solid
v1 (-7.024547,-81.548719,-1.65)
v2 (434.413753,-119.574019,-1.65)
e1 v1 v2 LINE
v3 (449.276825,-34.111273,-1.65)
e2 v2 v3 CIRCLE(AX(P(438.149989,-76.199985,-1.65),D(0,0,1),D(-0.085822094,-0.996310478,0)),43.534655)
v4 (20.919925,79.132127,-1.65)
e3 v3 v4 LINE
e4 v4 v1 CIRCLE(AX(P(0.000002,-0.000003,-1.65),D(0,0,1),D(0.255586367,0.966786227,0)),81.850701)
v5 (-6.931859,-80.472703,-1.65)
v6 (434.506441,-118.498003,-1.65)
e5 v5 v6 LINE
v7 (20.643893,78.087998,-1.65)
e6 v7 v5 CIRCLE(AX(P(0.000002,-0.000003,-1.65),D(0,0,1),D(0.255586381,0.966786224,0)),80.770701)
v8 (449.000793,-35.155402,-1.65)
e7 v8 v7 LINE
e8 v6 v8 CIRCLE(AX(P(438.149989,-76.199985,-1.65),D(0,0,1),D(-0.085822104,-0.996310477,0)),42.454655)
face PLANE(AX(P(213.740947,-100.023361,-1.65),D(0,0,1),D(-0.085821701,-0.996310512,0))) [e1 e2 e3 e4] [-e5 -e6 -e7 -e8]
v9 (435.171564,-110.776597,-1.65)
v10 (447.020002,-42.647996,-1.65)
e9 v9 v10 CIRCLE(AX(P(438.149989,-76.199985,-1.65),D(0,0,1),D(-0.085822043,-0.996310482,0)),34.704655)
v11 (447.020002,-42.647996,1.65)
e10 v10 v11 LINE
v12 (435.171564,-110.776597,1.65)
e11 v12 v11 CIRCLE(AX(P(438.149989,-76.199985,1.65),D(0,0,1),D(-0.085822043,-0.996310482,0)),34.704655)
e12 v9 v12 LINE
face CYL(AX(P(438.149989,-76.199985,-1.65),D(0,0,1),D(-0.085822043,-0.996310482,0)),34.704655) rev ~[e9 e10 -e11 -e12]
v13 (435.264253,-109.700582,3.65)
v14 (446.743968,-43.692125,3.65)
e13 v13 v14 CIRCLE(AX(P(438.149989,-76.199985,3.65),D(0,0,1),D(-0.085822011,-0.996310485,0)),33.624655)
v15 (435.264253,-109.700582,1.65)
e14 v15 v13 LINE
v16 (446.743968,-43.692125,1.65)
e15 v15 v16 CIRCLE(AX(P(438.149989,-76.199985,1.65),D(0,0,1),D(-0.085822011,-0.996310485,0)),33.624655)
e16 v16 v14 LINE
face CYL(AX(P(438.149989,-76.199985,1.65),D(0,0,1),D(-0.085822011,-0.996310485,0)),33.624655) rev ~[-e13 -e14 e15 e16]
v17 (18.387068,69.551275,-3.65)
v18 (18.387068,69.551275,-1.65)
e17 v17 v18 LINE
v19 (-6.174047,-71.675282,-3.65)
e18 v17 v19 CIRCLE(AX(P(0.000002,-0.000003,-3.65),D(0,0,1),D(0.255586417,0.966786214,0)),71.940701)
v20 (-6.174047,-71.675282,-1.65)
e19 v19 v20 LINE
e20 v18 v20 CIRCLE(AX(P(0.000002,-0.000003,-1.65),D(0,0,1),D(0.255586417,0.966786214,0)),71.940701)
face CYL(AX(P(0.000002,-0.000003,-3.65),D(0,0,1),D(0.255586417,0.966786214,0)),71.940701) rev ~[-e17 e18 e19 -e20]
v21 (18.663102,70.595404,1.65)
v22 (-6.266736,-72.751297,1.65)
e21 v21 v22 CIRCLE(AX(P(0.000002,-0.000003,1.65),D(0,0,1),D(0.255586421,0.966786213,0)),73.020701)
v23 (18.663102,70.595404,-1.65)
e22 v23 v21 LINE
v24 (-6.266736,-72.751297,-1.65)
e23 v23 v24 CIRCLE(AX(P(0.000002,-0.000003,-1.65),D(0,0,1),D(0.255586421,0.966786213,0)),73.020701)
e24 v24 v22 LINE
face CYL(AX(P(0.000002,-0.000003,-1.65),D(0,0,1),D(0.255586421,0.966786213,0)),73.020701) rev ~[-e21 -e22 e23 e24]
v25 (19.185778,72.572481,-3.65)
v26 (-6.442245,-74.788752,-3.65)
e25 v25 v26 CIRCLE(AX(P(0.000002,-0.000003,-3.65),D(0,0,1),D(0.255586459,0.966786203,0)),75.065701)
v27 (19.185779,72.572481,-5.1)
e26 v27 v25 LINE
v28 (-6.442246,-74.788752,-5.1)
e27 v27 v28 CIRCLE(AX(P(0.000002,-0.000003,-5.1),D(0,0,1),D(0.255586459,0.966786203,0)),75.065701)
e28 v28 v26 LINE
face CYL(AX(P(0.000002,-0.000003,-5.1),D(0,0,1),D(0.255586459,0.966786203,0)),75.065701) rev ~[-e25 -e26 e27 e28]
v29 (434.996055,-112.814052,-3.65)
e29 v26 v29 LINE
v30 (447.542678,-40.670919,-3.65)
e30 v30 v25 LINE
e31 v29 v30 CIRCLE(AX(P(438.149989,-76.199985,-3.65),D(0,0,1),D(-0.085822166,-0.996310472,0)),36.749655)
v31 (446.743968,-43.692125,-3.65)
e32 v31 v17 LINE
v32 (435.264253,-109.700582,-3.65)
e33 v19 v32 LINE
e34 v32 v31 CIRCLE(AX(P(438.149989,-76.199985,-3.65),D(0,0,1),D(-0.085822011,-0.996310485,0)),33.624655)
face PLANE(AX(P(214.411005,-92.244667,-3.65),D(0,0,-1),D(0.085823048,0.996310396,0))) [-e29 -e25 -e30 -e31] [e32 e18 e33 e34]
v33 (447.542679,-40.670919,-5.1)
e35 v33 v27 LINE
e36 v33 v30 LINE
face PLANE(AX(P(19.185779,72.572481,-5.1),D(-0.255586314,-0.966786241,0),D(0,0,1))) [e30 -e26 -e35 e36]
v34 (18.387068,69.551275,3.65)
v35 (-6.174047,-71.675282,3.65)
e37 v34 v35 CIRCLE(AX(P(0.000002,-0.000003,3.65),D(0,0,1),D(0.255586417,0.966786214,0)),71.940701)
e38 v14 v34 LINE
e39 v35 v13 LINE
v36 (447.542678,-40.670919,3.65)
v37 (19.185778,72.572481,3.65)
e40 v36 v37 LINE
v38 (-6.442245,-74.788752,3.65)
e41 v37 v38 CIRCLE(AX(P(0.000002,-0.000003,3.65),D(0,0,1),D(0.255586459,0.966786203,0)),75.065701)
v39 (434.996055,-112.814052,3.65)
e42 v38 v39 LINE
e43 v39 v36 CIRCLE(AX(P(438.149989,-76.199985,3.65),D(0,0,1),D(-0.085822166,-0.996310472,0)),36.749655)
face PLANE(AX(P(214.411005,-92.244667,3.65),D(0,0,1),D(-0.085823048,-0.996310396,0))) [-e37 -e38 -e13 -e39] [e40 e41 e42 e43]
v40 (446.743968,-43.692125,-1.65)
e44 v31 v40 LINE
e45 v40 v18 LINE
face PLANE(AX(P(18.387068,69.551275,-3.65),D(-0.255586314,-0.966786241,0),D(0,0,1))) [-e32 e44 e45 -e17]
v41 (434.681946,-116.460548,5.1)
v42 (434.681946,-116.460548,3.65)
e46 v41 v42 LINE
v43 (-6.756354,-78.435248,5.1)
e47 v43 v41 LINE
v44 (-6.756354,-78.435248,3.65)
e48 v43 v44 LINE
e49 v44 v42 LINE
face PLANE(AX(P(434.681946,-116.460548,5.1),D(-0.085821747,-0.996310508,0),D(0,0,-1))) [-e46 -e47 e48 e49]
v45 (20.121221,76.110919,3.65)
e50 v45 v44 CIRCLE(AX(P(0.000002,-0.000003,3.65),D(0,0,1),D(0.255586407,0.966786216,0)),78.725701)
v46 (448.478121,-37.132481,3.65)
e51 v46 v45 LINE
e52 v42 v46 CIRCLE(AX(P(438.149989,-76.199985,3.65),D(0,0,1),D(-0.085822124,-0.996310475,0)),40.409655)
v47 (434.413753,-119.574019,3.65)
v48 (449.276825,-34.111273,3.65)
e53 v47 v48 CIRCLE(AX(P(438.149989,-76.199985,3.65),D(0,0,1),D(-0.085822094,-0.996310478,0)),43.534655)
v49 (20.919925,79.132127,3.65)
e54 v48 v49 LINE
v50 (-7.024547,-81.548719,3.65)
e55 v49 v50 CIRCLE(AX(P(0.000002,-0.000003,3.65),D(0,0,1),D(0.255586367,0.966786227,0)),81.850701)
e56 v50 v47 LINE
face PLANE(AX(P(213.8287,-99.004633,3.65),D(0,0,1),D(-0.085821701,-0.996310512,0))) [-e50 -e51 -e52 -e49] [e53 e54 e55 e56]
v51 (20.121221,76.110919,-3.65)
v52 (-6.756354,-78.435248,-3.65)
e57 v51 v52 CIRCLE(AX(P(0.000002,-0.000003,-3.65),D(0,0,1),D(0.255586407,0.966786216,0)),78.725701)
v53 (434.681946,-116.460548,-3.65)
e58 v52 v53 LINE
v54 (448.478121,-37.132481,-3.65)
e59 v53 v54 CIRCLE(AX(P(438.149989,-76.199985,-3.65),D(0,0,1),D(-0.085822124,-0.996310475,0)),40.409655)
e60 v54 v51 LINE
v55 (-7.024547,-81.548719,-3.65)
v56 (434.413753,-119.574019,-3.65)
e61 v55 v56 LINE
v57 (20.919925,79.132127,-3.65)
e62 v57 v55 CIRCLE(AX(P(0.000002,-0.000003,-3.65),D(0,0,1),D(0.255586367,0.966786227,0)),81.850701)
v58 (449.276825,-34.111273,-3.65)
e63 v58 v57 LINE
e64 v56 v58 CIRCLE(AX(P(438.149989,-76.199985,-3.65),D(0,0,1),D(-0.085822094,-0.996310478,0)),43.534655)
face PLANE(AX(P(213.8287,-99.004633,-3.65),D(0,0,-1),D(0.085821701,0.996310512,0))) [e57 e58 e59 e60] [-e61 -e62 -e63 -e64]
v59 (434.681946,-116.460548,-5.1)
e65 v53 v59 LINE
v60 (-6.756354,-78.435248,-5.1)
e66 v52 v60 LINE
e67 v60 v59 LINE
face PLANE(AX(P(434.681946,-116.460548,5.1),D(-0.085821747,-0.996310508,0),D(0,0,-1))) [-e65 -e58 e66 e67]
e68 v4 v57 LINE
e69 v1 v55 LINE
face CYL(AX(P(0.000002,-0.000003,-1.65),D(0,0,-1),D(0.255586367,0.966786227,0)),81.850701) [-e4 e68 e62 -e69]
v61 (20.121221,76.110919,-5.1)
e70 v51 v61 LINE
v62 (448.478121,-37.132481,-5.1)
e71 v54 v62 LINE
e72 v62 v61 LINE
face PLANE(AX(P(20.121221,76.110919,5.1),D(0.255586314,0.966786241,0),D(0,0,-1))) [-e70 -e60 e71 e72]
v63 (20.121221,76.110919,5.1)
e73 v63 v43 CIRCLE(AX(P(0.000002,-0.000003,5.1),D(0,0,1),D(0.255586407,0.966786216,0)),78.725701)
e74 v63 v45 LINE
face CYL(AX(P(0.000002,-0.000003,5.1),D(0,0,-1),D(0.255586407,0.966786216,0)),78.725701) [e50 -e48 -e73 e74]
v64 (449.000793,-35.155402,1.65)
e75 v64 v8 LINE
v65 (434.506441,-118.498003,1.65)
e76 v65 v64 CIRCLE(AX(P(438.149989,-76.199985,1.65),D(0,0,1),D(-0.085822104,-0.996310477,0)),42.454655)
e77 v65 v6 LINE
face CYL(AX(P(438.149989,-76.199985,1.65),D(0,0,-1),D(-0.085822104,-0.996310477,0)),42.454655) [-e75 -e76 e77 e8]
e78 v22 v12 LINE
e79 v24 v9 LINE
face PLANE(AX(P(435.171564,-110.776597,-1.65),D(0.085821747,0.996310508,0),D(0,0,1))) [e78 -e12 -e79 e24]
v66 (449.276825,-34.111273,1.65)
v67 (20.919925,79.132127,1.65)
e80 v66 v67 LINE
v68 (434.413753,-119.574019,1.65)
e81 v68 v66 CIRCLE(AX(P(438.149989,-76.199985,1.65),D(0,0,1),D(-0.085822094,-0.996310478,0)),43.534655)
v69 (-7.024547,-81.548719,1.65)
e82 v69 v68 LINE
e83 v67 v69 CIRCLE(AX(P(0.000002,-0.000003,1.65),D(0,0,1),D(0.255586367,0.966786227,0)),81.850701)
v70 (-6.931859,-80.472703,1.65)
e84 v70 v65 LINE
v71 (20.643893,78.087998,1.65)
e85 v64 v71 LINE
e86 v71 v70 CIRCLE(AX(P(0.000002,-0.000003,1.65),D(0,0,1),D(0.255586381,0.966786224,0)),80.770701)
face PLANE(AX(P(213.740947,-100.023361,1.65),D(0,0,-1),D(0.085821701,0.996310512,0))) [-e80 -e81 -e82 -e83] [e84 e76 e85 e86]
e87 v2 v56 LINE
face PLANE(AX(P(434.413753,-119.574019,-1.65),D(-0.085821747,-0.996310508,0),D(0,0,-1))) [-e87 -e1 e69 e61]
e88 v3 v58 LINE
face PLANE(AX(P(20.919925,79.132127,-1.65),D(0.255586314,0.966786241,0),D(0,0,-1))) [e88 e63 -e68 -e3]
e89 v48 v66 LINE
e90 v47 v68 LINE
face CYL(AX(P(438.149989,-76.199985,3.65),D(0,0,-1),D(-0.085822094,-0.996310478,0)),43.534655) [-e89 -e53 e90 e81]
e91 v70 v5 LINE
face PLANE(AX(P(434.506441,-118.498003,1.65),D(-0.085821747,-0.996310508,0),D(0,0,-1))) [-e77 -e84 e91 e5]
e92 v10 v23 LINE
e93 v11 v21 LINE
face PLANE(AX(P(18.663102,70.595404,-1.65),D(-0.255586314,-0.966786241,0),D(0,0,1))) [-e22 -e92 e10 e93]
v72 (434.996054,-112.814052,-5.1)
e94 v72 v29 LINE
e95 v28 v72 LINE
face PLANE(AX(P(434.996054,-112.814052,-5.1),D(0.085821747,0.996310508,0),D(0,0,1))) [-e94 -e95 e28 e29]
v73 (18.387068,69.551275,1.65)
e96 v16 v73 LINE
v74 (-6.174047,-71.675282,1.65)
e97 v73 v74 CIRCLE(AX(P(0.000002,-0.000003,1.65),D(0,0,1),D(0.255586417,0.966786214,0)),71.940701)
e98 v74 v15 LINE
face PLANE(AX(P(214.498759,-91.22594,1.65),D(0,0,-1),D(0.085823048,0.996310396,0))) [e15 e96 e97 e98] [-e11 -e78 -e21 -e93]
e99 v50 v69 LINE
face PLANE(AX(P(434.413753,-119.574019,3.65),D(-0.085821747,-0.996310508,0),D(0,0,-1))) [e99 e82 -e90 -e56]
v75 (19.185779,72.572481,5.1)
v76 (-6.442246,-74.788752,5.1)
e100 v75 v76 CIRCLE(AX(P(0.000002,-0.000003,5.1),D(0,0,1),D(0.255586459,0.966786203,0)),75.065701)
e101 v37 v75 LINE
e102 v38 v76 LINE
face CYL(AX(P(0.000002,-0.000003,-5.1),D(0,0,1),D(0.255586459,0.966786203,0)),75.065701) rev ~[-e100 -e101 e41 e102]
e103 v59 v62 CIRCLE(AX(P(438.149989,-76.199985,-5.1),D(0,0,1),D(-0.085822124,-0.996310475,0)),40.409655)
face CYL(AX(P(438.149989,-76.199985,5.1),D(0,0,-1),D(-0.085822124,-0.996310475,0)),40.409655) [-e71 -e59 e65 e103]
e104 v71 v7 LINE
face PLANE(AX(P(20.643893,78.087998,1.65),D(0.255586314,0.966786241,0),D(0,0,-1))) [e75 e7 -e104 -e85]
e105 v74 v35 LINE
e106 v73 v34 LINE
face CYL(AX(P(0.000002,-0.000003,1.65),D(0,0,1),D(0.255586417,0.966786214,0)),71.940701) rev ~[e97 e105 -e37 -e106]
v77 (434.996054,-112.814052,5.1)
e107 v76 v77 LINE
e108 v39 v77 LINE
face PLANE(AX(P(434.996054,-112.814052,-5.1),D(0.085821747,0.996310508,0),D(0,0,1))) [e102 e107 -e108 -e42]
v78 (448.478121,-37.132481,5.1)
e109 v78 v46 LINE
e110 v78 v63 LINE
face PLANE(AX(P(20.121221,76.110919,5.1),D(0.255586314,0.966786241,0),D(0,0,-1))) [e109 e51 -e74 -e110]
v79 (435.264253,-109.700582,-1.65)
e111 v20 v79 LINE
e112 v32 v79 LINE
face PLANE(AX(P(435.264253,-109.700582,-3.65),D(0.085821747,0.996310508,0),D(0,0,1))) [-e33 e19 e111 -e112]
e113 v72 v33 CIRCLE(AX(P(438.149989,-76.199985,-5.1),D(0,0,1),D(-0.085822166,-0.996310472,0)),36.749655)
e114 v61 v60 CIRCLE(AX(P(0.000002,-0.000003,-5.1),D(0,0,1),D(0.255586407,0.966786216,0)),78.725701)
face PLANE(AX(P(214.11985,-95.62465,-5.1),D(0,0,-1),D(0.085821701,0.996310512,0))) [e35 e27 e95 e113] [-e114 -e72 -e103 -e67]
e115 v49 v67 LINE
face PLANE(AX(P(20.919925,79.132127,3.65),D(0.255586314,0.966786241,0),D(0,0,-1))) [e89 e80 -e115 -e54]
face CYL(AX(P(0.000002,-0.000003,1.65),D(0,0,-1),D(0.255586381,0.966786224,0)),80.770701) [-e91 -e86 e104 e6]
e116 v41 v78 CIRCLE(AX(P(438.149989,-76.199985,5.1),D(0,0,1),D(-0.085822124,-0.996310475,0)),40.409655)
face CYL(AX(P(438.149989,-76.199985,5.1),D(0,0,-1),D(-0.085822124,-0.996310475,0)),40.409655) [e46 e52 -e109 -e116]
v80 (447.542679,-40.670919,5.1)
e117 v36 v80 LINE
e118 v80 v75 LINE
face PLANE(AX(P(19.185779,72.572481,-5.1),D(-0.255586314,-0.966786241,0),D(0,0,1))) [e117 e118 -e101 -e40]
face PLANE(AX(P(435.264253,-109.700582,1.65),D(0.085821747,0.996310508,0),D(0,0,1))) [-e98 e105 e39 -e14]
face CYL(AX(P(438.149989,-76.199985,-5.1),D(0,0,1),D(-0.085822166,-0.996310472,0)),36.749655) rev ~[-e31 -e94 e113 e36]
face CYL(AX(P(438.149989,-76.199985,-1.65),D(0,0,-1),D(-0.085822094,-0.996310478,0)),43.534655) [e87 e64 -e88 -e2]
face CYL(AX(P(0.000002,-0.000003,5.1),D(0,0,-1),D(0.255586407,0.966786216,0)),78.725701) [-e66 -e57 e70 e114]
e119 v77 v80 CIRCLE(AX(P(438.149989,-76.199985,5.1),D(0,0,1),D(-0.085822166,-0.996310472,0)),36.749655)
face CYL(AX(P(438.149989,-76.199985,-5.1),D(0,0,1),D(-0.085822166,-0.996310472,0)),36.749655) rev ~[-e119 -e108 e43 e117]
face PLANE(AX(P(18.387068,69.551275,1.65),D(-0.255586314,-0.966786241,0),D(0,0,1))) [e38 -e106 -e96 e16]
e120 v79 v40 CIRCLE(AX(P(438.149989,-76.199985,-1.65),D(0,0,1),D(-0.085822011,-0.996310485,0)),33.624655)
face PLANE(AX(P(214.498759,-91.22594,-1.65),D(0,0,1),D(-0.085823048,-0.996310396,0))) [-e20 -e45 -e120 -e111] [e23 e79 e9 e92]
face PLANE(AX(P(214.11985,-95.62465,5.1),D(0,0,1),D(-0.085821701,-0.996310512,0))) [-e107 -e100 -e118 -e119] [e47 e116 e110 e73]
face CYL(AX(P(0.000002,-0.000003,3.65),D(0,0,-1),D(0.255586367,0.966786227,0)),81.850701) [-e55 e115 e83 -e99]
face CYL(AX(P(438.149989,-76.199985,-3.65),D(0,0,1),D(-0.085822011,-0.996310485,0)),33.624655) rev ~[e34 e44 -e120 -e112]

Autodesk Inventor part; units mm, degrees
ref_plane "Work Plane2" through (0, 0, 0) normal (-1, 0, 0) x (0, 0, 1)
ref_plane "Work Plane3" through (438.15, -76.2, 0) normal (-0.9048411, 0.4257495, 0) x (0, 0, 1)
sketch "Path" plane through (0, 0, 0) normal (0, 0, 1) x (1, 0, 0)
  arc A0 (19.6535, 74.3417) -> (-6.5993, -76.612) centre (0, 0) ccw
  arc A1 (434.839, -114.6373) -> (448.0104, -38.9017) centre (438.15, -76.2) ccw
  line L0 (434.839, -114.6373) -> (-6.5993, -76.612)
  line L1 (19.6535, 74.3417) -> (448.0104, -38.9017)
  dimension "d31" = 9.91
ref_plane "Section Plane" through (-6.5993, -76.612, 0) normal (0.9963105, -0.0858217, 0) x (0, 0, 1)
sketch "Section Sketch" plane through (-6.5993, -76.612, 0) normal (0.9963105, -0.0858217, 0) x (0, 0, 1)
  line L0 (-5.1, -1.83) -> (5.1, -1.83)
  line L1 (5.1, -1.83) -> (5.1, 1.83)
  line L2 (5.1, 1.83) -> (-5.1, 1.83)
  line L3 (-5.1, 1.83) -> (-5.1, -1.83)
  line L4 (-1.65, -3.875) -> (1.65, -3.875)
  line L5 (1.65, -3.875) -> (1.65, 3.875)
  line L6 (1.65, 3.875) -> (-1.65, 3.875)
  line L7 (-1.65, 3.875) -> (-1.65, -3.875)
  line L8 (-1.65, 0) -> (1.65, 0) construction
  line L9 (-3.65, -4.955) -> (-1.65, -4.955)
  line L10 (-1.65, -4.955) -> (-1.65, 4.955)
  line L11 (-1.65, 4.955) -> (-3.65, 4.955)
  line L12 (-3.65, 4.955) -> (-3.65, -4.955)
  line L13 (1.65, -4.955) -> (3.65, -4.955)
  line L14 (3.65, -4.955) -> (3.65, 4.955)
  line L15 (3.65, 4.955) -> (1.65, 4.955)
  line L16 (1.65, 4.955) -> (1.65, -4.955)
  line L17 (-5.1, 0) -> (5.1, 0) construction
  point P0 (0, 0)
  point P1 (0, 0)
  dimension "d21" = 3.66
  dimension "d22" = 7.75
  dimension "d23" = 3.3
  dimension "d24" = 2
  dimension "d31" = 9.91
  dimension "d32" = 10.2
sweep "Solid" add profiles "Section Sketch" path "Path"
pattern_of_one "Strand Pattern"
equation "\"d21\" = da_d2"
equation "\"d22\" = da_d1"
equation "\"d23\" = da_b1"
equation "\"d24\" = da_t1 + da_t2"
equation "\"d30\" = da_pt"
equation "\"da_p\" = 12.7"
equation "\"da_b1\" = 3.3"
equation "\"da_h2\" = 9.91"
equation "\"da_h3\" = 9.91"
equation "\"da_d1\" = 7.75"
equation "\"da_d2\" = 3.66"
equation "\"da_pt\" = 13.92"
equation "\"da_b\" = 10.2"
equation "\"da_t1\" = 1"
equation "\"da_t2\" = 1"
properties part number "Roller Chain"
